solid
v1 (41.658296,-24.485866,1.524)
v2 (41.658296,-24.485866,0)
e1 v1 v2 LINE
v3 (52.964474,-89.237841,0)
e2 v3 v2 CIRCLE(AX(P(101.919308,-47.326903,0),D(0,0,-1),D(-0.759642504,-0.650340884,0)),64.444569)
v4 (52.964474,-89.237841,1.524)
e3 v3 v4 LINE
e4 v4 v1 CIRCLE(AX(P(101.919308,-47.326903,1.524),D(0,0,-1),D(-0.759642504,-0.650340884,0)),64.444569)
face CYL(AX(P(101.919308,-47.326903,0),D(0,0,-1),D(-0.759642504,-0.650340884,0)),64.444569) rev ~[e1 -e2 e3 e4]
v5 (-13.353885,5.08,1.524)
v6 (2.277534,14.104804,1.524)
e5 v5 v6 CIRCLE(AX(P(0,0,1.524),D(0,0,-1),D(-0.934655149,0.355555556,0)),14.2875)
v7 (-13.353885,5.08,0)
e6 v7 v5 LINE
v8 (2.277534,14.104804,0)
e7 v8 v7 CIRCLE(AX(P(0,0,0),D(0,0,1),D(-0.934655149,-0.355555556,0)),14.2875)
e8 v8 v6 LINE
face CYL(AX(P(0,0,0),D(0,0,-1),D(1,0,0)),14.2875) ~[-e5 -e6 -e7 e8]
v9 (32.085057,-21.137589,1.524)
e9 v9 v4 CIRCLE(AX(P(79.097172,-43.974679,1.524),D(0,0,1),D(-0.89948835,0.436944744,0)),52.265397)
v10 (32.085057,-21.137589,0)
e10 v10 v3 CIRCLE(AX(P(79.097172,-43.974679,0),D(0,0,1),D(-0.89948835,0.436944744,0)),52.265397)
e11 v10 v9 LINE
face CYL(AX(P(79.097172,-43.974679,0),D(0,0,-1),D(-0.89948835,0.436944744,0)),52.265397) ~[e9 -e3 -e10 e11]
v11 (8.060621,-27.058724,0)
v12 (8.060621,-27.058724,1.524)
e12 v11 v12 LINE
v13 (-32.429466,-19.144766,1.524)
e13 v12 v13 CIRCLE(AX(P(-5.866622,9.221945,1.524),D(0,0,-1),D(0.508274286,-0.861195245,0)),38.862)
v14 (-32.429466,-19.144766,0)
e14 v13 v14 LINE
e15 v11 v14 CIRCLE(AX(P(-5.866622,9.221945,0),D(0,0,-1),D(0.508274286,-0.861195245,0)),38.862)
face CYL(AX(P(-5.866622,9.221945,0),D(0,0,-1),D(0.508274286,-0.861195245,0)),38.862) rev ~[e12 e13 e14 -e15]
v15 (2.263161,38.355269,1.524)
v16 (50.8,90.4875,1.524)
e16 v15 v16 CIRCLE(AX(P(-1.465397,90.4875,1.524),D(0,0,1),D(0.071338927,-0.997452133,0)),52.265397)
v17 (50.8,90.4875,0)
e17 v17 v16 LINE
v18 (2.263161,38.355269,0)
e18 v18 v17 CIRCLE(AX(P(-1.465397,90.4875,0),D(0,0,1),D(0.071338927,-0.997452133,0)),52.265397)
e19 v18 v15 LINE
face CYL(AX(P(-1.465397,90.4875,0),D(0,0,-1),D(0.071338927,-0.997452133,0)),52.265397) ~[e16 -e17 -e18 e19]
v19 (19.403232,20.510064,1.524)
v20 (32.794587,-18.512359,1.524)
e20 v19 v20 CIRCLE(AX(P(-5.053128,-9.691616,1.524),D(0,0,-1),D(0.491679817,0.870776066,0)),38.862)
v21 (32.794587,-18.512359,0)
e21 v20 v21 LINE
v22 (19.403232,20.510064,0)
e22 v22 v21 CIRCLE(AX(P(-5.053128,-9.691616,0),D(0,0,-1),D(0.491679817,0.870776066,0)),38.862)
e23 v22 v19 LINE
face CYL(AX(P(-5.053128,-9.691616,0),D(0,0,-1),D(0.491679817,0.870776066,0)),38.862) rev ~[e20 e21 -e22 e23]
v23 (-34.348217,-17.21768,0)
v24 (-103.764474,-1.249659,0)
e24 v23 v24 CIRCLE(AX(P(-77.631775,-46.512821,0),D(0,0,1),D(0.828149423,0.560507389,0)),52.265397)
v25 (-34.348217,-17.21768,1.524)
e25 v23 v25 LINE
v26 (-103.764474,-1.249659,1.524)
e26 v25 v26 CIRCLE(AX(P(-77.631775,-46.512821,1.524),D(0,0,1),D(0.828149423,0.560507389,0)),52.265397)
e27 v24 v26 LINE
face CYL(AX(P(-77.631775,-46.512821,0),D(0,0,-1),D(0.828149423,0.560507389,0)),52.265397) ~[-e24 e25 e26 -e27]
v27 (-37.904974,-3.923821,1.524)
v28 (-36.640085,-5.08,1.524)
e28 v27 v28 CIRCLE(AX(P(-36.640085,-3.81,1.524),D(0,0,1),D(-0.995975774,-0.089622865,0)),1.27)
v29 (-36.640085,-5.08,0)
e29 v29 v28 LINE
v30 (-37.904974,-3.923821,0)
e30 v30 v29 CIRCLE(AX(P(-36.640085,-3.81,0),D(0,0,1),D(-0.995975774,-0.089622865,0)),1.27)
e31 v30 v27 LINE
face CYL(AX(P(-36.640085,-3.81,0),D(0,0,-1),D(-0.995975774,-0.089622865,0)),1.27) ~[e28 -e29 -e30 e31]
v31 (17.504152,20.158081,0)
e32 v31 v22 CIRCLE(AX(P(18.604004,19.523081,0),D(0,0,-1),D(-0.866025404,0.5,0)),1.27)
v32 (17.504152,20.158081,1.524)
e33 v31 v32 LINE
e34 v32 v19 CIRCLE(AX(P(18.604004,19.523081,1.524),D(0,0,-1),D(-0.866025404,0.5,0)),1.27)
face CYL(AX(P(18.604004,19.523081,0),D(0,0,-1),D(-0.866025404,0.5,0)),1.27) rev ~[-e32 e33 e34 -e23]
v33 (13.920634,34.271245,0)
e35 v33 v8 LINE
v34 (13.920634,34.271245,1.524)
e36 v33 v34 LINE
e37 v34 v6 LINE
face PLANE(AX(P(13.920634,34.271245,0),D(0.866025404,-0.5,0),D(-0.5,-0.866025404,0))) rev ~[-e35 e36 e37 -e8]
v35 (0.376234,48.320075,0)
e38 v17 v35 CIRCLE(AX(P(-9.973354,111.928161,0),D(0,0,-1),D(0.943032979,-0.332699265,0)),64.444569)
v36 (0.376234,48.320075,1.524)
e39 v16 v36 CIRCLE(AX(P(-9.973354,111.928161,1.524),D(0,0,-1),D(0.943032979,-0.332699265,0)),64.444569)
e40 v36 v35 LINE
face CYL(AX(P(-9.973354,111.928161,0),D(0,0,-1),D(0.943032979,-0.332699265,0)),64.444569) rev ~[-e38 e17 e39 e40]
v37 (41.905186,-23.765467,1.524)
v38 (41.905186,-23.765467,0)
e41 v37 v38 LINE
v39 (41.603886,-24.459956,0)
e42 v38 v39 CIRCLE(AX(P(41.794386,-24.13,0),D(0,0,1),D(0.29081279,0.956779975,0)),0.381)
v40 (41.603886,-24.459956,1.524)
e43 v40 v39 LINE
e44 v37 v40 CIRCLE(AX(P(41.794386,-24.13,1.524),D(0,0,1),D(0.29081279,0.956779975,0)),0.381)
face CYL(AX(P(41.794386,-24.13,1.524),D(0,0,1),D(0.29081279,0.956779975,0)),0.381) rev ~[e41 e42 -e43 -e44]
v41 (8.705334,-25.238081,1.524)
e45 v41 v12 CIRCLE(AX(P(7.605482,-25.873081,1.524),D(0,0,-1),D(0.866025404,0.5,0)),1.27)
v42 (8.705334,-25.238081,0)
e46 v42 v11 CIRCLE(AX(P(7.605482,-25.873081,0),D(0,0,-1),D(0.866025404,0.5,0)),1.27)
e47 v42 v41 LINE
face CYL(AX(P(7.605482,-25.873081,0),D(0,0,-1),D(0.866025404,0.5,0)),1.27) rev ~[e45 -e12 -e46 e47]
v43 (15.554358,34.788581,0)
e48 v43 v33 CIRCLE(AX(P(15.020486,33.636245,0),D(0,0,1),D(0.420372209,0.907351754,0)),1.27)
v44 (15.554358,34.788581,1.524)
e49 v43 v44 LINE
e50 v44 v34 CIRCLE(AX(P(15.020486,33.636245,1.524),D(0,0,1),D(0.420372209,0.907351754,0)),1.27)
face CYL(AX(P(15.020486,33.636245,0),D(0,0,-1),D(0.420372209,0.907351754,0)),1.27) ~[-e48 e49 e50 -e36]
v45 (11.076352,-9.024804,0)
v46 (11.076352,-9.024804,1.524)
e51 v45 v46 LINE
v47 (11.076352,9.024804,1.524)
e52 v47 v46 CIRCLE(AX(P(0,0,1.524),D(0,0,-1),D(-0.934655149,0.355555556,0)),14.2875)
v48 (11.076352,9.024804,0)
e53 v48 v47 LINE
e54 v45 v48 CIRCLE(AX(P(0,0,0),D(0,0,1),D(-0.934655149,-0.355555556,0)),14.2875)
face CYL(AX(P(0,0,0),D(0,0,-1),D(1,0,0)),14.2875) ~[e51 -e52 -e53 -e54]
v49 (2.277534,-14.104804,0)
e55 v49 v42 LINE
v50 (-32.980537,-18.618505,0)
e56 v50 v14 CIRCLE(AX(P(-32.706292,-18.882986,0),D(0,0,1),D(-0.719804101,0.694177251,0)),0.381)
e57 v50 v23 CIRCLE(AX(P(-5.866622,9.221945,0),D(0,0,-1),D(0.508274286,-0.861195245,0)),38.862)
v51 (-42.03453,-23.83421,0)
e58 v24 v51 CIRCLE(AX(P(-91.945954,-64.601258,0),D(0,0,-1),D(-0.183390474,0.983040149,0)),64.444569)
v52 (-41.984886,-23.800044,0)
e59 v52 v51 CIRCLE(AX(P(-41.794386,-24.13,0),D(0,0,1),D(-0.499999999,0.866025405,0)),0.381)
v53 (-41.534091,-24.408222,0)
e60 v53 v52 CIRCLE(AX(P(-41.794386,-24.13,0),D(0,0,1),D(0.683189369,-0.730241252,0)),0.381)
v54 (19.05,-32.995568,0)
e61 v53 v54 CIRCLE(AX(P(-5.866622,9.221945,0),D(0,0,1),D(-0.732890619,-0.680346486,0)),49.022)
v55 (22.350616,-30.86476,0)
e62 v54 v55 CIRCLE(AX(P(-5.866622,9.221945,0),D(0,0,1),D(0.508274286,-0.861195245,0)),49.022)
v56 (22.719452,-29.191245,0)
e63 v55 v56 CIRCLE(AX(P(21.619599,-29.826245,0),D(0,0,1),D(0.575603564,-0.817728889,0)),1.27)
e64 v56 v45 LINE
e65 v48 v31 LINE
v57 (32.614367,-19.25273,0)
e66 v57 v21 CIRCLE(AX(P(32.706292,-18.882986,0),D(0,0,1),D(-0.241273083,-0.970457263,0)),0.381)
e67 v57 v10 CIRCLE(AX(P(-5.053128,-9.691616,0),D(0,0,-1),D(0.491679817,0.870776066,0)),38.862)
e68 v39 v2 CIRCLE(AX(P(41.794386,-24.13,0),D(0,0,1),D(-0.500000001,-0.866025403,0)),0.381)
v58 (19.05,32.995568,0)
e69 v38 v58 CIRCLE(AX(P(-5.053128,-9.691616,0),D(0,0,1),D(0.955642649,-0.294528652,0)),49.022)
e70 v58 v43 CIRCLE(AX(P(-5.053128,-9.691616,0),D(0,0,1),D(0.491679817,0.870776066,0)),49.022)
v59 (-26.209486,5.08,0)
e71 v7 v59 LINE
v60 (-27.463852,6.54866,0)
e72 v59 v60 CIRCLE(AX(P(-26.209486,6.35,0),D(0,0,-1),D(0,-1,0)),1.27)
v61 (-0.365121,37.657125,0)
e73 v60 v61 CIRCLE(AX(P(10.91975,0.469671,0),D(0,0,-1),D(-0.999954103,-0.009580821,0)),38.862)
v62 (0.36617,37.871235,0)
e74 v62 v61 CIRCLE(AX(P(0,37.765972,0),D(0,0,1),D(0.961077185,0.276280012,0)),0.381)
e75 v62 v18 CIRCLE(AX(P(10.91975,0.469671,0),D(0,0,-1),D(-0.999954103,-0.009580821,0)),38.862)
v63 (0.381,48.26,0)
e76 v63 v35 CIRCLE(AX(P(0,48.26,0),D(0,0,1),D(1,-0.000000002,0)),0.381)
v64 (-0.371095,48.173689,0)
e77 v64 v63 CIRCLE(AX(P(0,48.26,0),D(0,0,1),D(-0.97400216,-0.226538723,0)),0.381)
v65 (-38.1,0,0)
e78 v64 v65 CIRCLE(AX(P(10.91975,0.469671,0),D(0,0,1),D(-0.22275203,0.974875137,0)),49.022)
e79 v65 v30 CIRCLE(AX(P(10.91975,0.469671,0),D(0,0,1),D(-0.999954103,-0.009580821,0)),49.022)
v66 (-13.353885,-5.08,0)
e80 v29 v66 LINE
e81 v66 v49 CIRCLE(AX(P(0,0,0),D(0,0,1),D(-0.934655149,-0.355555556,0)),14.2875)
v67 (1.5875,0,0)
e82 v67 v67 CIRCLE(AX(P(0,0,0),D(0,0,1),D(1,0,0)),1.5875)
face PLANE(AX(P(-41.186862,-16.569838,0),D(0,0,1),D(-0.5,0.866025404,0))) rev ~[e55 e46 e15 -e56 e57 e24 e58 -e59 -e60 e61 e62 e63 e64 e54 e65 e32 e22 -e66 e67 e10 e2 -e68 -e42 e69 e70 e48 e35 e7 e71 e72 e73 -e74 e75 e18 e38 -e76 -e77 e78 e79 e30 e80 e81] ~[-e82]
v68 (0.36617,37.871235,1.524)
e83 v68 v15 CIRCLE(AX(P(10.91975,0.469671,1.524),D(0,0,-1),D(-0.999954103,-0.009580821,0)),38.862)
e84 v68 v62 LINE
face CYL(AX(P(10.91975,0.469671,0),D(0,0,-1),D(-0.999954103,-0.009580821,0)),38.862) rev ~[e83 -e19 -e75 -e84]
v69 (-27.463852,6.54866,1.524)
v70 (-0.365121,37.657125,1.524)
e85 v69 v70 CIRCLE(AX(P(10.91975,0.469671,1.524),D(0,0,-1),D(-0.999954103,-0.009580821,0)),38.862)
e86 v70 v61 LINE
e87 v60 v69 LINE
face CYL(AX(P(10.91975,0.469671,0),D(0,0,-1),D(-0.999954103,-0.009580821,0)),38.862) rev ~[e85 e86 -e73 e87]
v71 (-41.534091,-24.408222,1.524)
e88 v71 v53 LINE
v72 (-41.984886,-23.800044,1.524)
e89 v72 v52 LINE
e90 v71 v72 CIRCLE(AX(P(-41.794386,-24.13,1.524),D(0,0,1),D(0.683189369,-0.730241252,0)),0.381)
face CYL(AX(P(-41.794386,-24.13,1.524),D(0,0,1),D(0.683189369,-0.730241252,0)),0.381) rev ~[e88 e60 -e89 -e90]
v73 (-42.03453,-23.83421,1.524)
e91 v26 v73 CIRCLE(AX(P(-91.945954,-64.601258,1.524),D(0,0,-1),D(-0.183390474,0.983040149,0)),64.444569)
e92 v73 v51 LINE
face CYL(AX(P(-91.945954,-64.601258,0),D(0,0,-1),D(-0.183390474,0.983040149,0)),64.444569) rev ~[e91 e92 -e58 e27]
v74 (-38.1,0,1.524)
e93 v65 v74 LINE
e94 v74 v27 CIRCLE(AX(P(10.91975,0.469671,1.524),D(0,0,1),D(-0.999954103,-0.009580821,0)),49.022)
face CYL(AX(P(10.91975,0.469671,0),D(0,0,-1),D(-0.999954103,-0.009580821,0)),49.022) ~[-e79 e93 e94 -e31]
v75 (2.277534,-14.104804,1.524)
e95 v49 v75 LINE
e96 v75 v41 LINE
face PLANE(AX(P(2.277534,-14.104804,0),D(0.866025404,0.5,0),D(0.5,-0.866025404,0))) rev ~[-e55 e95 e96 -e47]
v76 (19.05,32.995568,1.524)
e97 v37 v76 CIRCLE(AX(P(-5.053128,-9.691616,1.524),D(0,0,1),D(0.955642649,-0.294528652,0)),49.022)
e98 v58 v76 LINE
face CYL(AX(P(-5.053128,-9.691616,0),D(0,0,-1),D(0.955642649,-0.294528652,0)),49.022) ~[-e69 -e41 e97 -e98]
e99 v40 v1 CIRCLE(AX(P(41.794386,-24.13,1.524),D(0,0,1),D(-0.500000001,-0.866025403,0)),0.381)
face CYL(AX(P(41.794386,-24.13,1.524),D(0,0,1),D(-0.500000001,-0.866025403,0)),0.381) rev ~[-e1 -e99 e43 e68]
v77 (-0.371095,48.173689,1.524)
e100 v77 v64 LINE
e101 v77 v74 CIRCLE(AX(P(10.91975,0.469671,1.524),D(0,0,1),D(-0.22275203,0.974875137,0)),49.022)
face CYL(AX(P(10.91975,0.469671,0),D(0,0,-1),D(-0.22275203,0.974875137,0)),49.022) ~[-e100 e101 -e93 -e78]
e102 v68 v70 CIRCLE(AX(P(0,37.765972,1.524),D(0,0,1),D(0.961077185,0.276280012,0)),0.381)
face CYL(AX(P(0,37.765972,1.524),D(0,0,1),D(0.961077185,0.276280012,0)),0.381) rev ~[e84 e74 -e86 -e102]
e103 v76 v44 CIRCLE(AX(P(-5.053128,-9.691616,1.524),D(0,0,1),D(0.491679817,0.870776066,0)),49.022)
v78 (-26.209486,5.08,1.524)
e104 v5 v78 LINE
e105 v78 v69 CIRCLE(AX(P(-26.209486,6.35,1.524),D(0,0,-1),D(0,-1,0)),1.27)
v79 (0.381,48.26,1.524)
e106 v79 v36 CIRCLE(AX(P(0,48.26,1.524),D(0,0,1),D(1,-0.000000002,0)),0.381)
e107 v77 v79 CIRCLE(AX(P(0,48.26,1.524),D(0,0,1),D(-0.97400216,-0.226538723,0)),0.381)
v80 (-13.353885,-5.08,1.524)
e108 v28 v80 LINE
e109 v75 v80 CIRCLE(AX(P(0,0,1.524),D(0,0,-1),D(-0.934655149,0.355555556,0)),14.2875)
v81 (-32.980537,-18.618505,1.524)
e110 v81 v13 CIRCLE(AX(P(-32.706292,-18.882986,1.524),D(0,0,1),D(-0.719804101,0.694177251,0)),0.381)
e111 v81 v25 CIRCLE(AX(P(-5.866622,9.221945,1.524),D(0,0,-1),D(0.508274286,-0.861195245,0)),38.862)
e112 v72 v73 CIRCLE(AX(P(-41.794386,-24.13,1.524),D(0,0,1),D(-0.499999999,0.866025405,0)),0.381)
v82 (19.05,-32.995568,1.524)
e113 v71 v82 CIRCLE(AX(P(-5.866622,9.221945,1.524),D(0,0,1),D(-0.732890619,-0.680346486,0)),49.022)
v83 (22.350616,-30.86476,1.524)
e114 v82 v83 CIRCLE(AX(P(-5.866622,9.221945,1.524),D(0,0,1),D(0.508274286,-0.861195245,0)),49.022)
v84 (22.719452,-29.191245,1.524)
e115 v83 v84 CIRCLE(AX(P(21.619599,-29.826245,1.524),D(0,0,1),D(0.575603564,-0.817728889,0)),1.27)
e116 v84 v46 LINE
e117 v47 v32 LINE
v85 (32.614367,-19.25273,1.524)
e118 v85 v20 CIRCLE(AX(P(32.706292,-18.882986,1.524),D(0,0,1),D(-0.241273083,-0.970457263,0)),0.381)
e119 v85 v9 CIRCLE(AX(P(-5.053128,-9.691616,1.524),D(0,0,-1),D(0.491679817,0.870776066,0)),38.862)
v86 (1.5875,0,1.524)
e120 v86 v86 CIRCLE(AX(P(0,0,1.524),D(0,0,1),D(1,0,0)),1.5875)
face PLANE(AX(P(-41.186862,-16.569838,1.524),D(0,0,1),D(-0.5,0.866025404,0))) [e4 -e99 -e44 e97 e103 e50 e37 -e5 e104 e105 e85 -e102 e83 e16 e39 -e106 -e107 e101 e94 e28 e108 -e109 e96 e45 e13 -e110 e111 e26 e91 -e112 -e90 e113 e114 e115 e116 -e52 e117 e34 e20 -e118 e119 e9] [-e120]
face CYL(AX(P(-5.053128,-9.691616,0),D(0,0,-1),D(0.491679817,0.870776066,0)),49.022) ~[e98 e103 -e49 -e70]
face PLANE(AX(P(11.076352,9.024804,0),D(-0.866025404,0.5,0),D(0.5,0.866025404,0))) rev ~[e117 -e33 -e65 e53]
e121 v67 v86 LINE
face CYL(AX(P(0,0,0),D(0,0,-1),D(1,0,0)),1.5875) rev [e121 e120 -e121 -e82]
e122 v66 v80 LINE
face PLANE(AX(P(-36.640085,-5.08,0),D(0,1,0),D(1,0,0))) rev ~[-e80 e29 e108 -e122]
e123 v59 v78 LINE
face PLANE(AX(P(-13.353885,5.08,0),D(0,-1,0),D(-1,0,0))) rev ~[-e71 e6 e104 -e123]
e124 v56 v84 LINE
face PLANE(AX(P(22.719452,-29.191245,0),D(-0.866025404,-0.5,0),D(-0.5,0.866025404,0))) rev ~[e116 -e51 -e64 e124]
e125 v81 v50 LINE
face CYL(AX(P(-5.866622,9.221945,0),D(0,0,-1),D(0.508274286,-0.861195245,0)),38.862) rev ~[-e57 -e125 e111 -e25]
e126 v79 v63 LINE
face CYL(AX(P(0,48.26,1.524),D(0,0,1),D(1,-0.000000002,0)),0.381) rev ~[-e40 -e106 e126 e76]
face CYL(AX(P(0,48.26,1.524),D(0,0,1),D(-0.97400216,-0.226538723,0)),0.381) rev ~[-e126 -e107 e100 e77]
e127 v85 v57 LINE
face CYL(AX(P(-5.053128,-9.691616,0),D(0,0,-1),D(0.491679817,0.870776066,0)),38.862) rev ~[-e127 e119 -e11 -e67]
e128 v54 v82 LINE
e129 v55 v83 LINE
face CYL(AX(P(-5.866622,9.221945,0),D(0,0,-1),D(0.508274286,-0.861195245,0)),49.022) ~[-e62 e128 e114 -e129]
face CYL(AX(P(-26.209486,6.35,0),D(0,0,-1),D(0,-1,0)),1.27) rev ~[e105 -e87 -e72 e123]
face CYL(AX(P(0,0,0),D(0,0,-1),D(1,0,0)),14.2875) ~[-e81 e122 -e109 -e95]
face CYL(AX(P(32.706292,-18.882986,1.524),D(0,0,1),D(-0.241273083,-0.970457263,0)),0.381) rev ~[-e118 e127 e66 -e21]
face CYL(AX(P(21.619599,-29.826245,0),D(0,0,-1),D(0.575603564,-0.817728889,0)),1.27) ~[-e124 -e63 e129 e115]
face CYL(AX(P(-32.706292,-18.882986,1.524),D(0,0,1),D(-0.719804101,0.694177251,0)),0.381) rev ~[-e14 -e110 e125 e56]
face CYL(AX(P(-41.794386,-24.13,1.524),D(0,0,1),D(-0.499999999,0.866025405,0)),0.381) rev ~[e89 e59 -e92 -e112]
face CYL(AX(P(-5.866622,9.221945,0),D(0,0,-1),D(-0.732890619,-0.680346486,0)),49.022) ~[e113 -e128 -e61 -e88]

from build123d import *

# Parameters (mm, degrees)
F2_DEPTH        = 1.524
F0_R            = 14.2875
F0_R_2          = 1.5875
F3_COUNT        = 3
F3_ANGLE        = 240
F6_DEPTH        = 240
F6_COPIES_COUNT = 3


# Not quite as in the source:
# - an extrude ends at something that could not be found from the text; its depth is read off the source's solid
# - a pattern or mirror of a feature is missing from the dataset's text; its kind, count and spacing are read off the source's solid
# - a feature names something its author has since deleted; it is built from what else it names


with BuildPart() as f2:
    # F0 (on Top) → F2 (new body)
    with BuildSketch(Plane.XY):
        with BuildLine():
            ThreePointArc((50.8, 90.4875), (31.2220900836, 62.3697318544), (0, 48.26))
            ThreePointArc((0, 48.26), (-27.5567729007, 30.8458733427), (-38.1, 0))
            Line((-38.1, 0), (-27.9404663148, 0.0973411457))
            ThreePointArc((-27.9404663148, 0.0973411457), (-19.5823640029, 24.5502873707), (2.2631606282, 38.3552686068))
            ThreePointArc((2.2631606282, 38.3552686068), (36.7873562722, 54.8729161676), (50.8, 90.4875))
        make_face()
    extrude(amount=F2_DEPTH)


with BuildPart() as f2b:
    # F0 (on Top) → F2, piece 2 (new body)
    with BuildSketch(Plane.XY):
        Circle(F0_R)
        Circle(F0_R_2, mode=Mode.SUBTRACT)
    extrude(amount=F2_DEPTH)


with BuildPart() as f2c:
    # F1 (on face) → F2, piece 3 (new body)
    with BuildSketch(Plane.XY):
        with BuildLine():
            ThreePointArc((-13.3538854365, -5.08), (-14.2875, 0), (-13.3538854365, 5.08))
            Line((-13.3538854365, 5.08), (-26.2094863625, 5.08))
            ThreePointArc((-26.2094863625, 5.08), (-27.1751979909, 5.5251963562), (-27.4638524569, 6.5486597626))
            ThreePointArc((-27.4638524569, 6.5486597626), (-27.8366270568, 3.3329347264), (-27.9404663148, 0.0973411457))
            Line((-27.9404663148, 0.0973411457), (-38.1, 0))
            ThreePointArc((-38.1, 0), (-38.0418102628, -1.963864994), (-37.9049743558, -3.923821038))
            ThreePointArc((-37.9049743558, -3.923821038), (-37.4969244549, -4.7474040533), (-36.6400851229, -5.08))
            Line((-36.6400851229, -5.08), (-13.3538854365, -5.08))
        make_face()
    extrude(amount=F2_DEPTH)


with BuildPart() as f3_1:
    # F3: instance of F2
    add(f2.part.rotate(Axis((0, 0, 0), (0, 0, 1)), 1 * F3_ANGLE / (F3_COUNT - 1)))


with BuildPart() as f3_2:
    # F3: instance of F2
    add(f2.part.rotate(Axis((0, 0, 0), (0, 0, 1)), 2 * F3_ANGLE / (F3_COUNT - 1)))


with BuildPart() as f3_3:
    # F3: instance of F2c
    add(f2c.part.rotate(Axis((0, 0, 0), (0, 0, 1)), 1 * F3_ANGLE / (F3_COUNT - 1)))


with BuildPart() as f3_4:
    # F3: instance of F2c
    add(f2c.part.rotate(Axis((0, 0, 0), (0, 0, 1)), 2 * F3_ANGLE / (F3_COUNT - 1)))


with BuildPart() as f2_1:
    add(f2.part)

    # F4: union F2c, F2b, F3_4, F3_2, F3_3, F3_1
    add(f2c.part)
    add(f2b.part)
    add(f3_4.part)
    add(f3_2.part)
    add(f3_3.part)
    add(f3_1.part)

    # F5 (on face) → F6 (cut, through all)
    with BuildSketch(Plane.XY.offset(1.524)):
        with BuildLine():
            ThreePointArc((0, 48.26), (0.1881613405, 48.2897596913), (0.3762338884, 48.3200754628))
            ThreePointArc((0.3762338884, 48.3200754628), (-0.0732384475, 48.6338945437), (-0.3710948228, 48.1736887464))
            ThreePointArc((-0.3710948228, 48.1736887464), (-0.1856312633, 48.2172048941), (0, 48.26))
        make_face()
        with BuildLine():
            ThreePointArc((-0.3710948228, 48.1736887464), (0.0434388796, 47.8814843943), (0.381, 48.26))
            ThreePointArc((0.381, 48.26), (0.3798066031, 48.2901321135), (0.3762338884, 48.3200754628))
            ThreePointArc((0.3762338884, 48.3200754628), (0.1881613405, 48.2897596913), (0, 48.26))
            ThreePointArc((0, 48.26), (-0.1856312633, 48.2172048941), (-0.3710948228, 48.1736887464))
        make_face()
        with BuildLine():
            ThreePointArc((-0.3651208351, 37.6571250082), (0, 37.7659724968), (0.3661704074, 37.8712351814))
            ThreePointArc((0.3661704074, 37.8712351814), (-0.1070563729, 38.1316225112), (-0.3651208351, 37.6571250082))
        make_face()
    f6 = extrude(amount=-F6_DEPTH, mode=Mode.SUBTRACT)

    # F6_copies: F6 ×3 about axis
    f6_copies_axis = Axis((0, 0, 0), (0, 0, 1))
    for i in range(1, F6_COPIES_COUNT):
        add(f6.rotate(f6_copies_axis, i * 360 / F6_COPIES_COUNT), mode=Mode.SUBTRACT)


solid = f2_1.part
